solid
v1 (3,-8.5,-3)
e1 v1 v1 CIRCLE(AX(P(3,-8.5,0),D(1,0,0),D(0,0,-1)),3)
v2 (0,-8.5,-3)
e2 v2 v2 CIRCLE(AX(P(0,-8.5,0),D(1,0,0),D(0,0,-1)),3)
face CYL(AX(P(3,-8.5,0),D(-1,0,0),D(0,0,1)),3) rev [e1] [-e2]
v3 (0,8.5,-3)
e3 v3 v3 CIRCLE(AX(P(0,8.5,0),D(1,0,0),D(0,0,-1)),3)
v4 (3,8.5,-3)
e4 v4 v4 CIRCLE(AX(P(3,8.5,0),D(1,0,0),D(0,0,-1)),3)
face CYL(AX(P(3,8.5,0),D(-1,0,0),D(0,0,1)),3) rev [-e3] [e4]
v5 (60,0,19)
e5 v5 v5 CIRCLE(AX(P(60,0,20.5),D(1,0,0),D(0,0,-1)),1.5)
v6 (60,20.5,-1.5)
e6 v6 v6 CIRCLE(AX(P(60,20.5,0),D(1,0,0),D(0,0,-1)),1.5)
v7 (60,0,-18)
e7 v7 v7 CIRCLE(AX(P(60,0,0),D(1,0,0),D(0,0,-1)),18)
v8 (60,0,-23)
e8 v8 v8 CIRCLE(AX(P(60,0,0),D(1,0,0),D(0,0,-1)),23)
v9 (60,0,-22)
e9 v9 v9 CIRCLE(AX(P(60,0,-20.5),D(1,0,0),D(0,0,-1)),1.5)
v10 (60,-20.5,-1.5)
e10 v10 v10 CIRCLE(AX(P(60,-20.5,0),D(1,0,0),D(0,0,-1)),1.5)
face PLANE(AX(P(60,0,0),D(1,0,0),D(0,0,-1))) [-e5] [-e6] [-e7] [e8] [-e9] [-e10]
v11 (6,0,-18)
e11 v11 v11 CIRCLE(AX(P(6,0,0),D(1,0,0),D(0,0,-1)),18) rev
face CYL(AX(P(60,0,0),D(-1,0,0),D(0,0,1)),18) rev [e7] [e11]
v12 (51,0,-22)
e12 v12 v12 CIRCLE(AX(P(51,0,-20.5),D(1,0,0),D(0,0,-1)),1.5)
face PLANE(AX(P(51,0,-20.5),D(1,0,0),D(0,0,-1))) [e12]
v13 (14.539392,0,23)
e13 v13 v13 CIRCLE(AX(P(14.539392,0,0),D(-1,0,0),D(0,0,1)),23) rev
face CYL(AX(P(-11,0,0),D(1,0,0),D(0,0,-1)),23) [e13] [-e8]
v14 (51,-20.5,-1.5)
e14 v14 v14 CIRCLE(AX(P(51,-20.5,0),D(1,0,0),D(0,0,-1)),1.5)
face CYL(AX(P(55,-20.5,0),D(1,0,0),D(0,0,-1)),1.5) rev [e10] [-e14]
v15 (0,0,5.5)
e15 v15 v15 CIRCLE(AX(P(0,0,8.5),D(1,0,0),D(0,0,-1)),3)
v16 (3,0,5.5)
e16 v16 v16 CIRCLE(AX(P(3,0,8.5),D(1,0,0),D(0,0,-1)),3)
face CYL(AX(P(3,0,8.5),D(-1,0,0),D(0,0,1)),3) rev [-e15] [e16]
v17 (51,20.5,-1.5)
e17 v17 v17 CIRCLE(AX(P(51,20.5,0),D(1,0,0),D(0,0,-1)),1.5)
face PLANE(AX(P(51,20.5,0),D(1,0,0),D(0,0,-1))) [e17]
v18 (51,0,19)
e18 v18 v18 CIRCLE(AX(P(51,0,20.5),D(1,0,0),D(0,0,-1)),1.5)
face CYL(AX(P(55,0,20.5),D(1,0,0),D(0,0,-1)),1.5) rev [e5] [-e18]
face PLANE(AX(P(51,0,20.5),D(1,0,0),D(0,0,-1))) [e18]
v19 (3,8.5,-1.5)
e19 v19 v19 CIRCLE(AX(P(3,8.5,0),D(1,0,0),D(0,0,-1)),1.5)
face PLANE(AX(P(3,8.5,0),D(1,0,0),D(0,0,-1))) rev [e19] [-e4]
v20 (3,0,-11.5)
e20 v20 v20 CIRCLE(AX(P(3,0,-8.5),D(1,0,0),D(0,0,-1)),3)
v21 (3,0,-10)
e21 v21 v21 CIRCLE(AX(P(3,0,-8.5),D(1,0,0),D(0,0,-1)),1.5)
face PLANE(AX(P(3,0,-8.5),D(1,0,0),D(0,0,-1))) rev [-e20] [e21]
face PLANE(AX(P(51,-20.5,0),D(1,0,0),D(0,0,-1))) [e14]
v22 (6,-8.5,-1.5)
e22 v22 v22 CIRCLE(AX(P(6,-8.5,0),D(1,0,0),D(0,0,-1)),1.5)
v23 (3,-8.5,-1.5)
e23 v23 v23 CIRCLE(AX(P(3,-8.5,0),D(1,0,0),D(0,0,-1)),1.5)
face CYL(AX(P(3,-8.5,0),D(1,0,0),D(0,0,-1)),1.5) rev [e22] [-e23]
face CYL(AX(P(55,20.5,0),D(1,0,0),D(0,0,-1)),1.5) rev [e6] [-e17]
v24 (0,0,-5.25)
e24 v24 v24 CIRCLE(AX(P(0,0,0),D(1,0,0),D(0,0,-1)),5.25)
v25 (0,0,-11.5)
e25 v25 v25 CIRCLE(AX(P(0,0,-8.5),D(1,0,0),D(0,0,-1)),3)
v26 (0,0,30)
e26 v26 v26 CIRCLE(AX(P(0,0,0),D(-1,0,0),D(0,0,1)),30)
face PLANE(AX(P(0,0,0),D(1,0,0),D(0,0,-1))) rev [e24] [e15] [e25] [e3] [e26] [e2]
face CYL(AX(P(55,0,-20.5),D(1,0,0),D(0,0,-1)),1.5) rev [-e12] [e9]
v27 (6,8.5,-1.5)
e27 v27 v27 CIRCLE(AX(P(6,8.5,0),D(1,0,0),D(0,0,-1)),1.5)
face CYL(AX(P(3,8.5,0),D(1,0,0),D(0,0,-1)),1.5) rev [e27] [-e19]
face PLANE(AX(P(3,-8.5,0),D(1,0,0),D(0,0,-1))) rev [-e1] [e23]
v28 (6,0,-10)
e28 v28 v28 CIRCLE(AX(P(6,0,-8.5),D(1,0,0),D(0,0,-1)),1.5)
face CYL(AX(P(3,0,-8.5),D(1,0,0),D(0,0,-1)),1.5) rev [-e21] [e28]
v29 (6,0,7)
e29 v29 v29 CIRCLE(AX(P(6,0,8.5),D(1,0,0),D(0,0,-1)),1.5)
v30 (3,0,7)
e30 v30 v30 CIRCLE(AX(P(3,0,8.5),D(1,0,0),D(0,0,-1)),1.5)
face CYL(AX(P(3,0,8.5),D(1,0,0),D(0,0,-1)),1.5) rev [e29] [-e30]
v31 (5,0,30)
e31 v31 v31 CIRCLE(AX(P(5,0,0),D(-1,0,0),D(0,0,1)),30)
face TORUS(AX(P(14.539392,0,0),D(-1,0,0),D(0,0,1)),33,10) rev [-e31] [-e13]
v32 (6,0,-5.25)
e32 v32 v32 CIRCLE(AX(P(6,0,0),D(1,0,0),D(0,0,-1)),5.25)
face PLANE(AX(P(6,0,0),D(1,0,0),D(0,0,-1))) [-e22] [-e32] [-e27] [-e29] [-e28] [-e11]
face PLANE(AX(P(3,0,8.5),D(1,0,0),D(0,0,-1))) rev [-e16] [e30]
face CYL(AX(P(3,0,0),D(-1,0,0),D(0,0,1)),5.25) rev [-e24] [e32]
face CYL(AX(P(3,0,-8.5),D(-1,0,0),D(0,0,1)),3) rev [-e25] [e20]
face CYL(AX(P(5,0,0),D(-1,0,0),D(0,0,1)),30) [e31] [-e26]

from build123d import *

# Parameters (mm, degrees)
SKETCH1_R                 = 23
SKETCH1_R_2               = 18
BOSS_EXTRUDE1_DEPTH       = 11
BOSS_EXTRUDE2_START       = 3
SKETCH1_13_R              = 23
SKETCH1_13_R_2            = 18
SKETCH1_13_R_3            = 3
SKETCH1_13_R_4            = 5.25
BOSS_EXTRUDE2_DEPTH       = 3
BOSS_EXTRUDE4_START       = 3
BOSS_EXTRUDE4_OUTLINE_R   = 23
BOSS_EXTRUDE4_OUTLINE_R_2 = 3
BOSS_EXTRUDE4_OUTLINE_R_3 = 5.25
BOSS_EXTRUDE4_DEPTH       = 3
BOSS_EXTRUDE5_START       = 60
SKETCH1_17_R              = 23
SKETCH1_17_R_2            = 18
BOSS_EXTRUDE5_DEPTH       = 60
SKETCH2_R                 = 1.5
CUT_EXTRUDE1_DEPTH        = 5
BOSS_EXTRUDE6_START       = 3
SKETCH1_20_R              = 3
SKETCH1_20_R_2            = 1.5
BOSS_EXTRUDE6_DEPTH       = 3
SKETCH1_21_R              = 23
SKETCH1_21_R_2            = 18
CUT_EXTRUDE4_DEPTH        = 23
SKETCH2_2_R               = 1.5
CUT_EXTRUDE5_DEPTH        = 9
BOSS_EXTRUDE7_START       = -5
SKETCH3_R                 = 30
SKETCH3_R_2               = 23
BOSS_EXTRUDE7_DEPTH       = 5
FILLET1_R                 = 10


# Read off the part's stored shape, not the designer's step: Boss-Extrude4
with BuildPart() as part:
    # Sketch1 → Boss-Extrude1 (new body)
    with BuildSketch(Plane(origin=(0, 0, 0), x_dir=(0, 0, -1), z_dir=(1, 0, 0))):
        Circle(SKETCH1_R)
        Circle(SKETCH1_R_2, mode=Mode.SUBTRACT)
    extrude(amount=-BOSS_EXTRUDE1_DEPTH)

    # Sketch1<13> → Boss-Extrude2 (add)
    # profile 1 of 2: a face of its own
    with BuildSketch(Plane(origin=(0, 0, 0), x_dir=(0, 0, -1), z_dir=(1, 0, 0)).offset(BOSS_EXTRUDE2_START)):
        Circle(SKETCH1_13_R)
        Circle(SKETCH1_13_R_2, mode=Mode.SUBTRACT)
    # profile 2 of 2: a face of its own
    with BuildSketch(Plane(origin=(0, 0, 0), x_dir=(0, 0, -1), z_dir=(1, 0, 0)).offset(BOSS_EXTRUDE2_START)):
        Circle(SKETCH1_13_R_2)
        with Locations((-8.5, 0)):
            Circle(SKETCH1_13_R_3, mode=Mode.SUBTRACT)
        with Locations((8.5, 0)):
            Circle(SKETCH1_13_R_3, mode=Mode.SUBTRACT)
        Circle(SKETCH1_13_R_4, mode=Mode.SUBTRACT)
        with Locations((0, -8.5)):
            Circle(SKETCH1_13_R_3, mode=Mode.SUBTRACT)
        with Locations((0, 8.5)):
            Circle(SKETCH1_13_R_3, mode=Mode.SUBTRACT)
    extrude(amount=-BOSS_EXTRUDE2_DEPTH)

    # Boss-Extrude4 outline → Boss-Extrude4 (add)
    with BuildSketch(Plane(origin=(0, 0, 0), x_dir=(0, 0, -1), z_dir=(1, 0, 0)).offset(BOSS_EXTRUDE4_START)):
        Circle(BOSS_EXTRUDE4_OUTLINE_R)
        with Locations((0, -8.5)):
            Circle(BOSS_EXTRUDE4_OUTLINE_R_2, mode=Mode.SUBTRACT)
        with Locations((-8.5, 0)):
            Circle(BOSS_EXTRUDE4_OUTLINE_R_2, mode=Mode.SUBTRACT)
        Circle(BOSS_EXTRUDE4_OUTLINE_R_3, mode=Mode.SUBTRACT)
        with Locations((8.5, 0)):
            Circle(BOSS_EXTRUDE4_OUTLINE_R_2, mode=Mode.SUBTRACT)
        with Locations((0, 8.5)):
            Circle(BOSS_EXTRUDE4_OUTLINE_R_2, mode=Mode.SUBTRACT)
    extrude(amount=BOSS_EXTRUDE4_DEPTH)

    # Sketch1<17> → Boss-Extrude5 (add)
    with BuildSketch(Plane(origin=(0, 0, 0), x_dir=(0, 0, -1), z_dir=(1, 0, 0)).offset(BOSS_EXTRUDE5_START)):
        Circle(SKETCH1_17_R)
        Circle(SKETCH1_17_R_2, mode=Mode.SUBTRACT)
    extrude(amount=-BOSS_EXTRUDE5_DEPTH)

    # Sketch2 → Cut-Extrude1 (cut)
    with BuildSketch(Plane(origin=(60, 0, 0), x_dir=(0, 0, -1), z_dir=(1, 0, 0))):
        with Locations((0, 20.5)):
            Circle(SKETCH2_R)
        with Locations((20.5, 0)):
            Circle(SKETCH2_R)
        with Locations((0, -20.5)):
            Circle(SKETCH2_R)
        with Locations((-20.5, 0)):
            Circle(SKETCH2_R)
    extrude(amount=-CUT_EXTRUDE1_DEPTH, mode=Mode.SUBTRACT)

    # Sketch1<20> → Boss-Extrude6 (add)
    # profile 1 of 4: a face of its own
    with BuildSketch(Plane(origin=(0, 0, 0), x_dir=(0, 0, -1), z_dir=(1, 0, 0)).offset(BOSS_EXTRUDE6_START)):
        with Locations((0, 8.5)):
            Circle(SKETCH1_20_R)
        with Locations((0, 8.5)):
            Circle(SKETCH1_20_R_2, mode=Mode.SUBTRACT)
    # profile 2 of 4: a face of its own
    with BuildSketch(Plane(origin=(0, 0, 0), x_dir=(0, 0, -1), z_dir=(1, 0, 0)).offset(BOSS_EXTRUDE6_START)):
        with Locations((-8.5, 0)):
            Circle(SKETCH1_20_R)
        with Locations((-8.5, 0)):
            Circle(SKETCH1_20_R_2, mode=Mode.SUBTRACT)
    # profile 3 of 4: a face of its own
    with BuildSketch(Plane(origin=(0, 0, 0), x_dir=(0, 0, -1), z_dir=(1, 0, 0)).offset(BOSS_EXTRUDE6_START)):
        with Locations((0, -8.5)):
            Circle(SKETCH1_20_R)
        with Locations((0, -8.5)):
            Circle(SKETCH1_20_R_2, mode=Mode.SUBTRACT)
    # profile 4 of 4: a face of its own
    with BuildSketch(Plane(origin=(0, 0, 0), x_dir=(0, 0, -1), z_dir=(1, 0, 0)).offset(BOSS_EXTRUDE6_START)):
        with Locations((8.5, 0)):
            Circle(SKETCH1_20_R)
        with Locations((8.5, 0)):
            Circle(SKETCH1_20_R_2, mode=Mode.SUBTRACT)
    extrude(amount=BOSS_EXTRUDE6_DEPTH)

    # Sketch1<21> → Cut-Extrude4 (cut)
    with BuildSketch(Plane(origin=(0, 0, 0), x_dir=(0, 0, -1), z_dir=(1, 0, 0))):
        Circle(SKETCH1_21_R)
        Circle(SKETCH1_21_R_2, mode=Mode.SUBTRACT)
    extrude(amount=-CUT_EXTRUDE4_DEPTH, mode=Mode.SUBTRACT)

    # Sketch2<2> → Cut-Extrude5 (cut)
    with BuildSketch(Plane(origin=(60, 0, 0), x_dir=(0, 0, -1), z_dir=(1, 0, 0))):
        with Locations((0, 20.5)):
            Circle(SKETCH2_2_R)
        with Locations((20.5, 0)):
            Circle(SKETCH2_2_R)
        with Locations((0, -20.5)):
            Circle(SKETCH2_2_R)
        with Locations((-20.5, 0)):
            Circle(SKETCH2_2_R)
    extrude(amount=-CUT_EXTRUDE5_DEPTH, mode=Mode.SUBTRACT)

    # Sketch3 → Boss-Extrude7 (add)
    with BuildSketch(Plane.ZY.offset(BOSS_EXTRUDE7_START)):
        Circle(SKETCH3_R)
        with Locations(Location((0, 0, 0), (0, 0, 180))):
            Circle(SKETCH3_R_2, mode=Mode.SUBTRACT)
    extrude(amount=BOSS_EXTRUDE7_DEPTH)

    # Fillet1
    # the kernel refuses this fillet: 10 mm, written as the material it adds along each edge
    with BuildSketch(Plane(origin=(5, 0, 0), x_dir=(0, 0, -1), z_dir=(0, 1, 0))) as fillet1_piece_1:
        with BuildLine():
            CenterArc((33, -9.539392014), FILLET1_R, 107.457603124, 72.542396876)
            Line((30, 0), (29.94, 0.19078784))
            ThreePointArc((29.94, 0.19078784), (26.5, 0.2), (23, 0.2))
            Line((23, 0.2), (22.8, 0))
            Line((22.8, 0), (22.8, -9.539392014))
            Line((22.8, -9.539392014), (23, -9.539392014))
        make_face()
    revolve(axis=Axis((5, 0, 0), (-1, 0, 0)))


solid = part.part
